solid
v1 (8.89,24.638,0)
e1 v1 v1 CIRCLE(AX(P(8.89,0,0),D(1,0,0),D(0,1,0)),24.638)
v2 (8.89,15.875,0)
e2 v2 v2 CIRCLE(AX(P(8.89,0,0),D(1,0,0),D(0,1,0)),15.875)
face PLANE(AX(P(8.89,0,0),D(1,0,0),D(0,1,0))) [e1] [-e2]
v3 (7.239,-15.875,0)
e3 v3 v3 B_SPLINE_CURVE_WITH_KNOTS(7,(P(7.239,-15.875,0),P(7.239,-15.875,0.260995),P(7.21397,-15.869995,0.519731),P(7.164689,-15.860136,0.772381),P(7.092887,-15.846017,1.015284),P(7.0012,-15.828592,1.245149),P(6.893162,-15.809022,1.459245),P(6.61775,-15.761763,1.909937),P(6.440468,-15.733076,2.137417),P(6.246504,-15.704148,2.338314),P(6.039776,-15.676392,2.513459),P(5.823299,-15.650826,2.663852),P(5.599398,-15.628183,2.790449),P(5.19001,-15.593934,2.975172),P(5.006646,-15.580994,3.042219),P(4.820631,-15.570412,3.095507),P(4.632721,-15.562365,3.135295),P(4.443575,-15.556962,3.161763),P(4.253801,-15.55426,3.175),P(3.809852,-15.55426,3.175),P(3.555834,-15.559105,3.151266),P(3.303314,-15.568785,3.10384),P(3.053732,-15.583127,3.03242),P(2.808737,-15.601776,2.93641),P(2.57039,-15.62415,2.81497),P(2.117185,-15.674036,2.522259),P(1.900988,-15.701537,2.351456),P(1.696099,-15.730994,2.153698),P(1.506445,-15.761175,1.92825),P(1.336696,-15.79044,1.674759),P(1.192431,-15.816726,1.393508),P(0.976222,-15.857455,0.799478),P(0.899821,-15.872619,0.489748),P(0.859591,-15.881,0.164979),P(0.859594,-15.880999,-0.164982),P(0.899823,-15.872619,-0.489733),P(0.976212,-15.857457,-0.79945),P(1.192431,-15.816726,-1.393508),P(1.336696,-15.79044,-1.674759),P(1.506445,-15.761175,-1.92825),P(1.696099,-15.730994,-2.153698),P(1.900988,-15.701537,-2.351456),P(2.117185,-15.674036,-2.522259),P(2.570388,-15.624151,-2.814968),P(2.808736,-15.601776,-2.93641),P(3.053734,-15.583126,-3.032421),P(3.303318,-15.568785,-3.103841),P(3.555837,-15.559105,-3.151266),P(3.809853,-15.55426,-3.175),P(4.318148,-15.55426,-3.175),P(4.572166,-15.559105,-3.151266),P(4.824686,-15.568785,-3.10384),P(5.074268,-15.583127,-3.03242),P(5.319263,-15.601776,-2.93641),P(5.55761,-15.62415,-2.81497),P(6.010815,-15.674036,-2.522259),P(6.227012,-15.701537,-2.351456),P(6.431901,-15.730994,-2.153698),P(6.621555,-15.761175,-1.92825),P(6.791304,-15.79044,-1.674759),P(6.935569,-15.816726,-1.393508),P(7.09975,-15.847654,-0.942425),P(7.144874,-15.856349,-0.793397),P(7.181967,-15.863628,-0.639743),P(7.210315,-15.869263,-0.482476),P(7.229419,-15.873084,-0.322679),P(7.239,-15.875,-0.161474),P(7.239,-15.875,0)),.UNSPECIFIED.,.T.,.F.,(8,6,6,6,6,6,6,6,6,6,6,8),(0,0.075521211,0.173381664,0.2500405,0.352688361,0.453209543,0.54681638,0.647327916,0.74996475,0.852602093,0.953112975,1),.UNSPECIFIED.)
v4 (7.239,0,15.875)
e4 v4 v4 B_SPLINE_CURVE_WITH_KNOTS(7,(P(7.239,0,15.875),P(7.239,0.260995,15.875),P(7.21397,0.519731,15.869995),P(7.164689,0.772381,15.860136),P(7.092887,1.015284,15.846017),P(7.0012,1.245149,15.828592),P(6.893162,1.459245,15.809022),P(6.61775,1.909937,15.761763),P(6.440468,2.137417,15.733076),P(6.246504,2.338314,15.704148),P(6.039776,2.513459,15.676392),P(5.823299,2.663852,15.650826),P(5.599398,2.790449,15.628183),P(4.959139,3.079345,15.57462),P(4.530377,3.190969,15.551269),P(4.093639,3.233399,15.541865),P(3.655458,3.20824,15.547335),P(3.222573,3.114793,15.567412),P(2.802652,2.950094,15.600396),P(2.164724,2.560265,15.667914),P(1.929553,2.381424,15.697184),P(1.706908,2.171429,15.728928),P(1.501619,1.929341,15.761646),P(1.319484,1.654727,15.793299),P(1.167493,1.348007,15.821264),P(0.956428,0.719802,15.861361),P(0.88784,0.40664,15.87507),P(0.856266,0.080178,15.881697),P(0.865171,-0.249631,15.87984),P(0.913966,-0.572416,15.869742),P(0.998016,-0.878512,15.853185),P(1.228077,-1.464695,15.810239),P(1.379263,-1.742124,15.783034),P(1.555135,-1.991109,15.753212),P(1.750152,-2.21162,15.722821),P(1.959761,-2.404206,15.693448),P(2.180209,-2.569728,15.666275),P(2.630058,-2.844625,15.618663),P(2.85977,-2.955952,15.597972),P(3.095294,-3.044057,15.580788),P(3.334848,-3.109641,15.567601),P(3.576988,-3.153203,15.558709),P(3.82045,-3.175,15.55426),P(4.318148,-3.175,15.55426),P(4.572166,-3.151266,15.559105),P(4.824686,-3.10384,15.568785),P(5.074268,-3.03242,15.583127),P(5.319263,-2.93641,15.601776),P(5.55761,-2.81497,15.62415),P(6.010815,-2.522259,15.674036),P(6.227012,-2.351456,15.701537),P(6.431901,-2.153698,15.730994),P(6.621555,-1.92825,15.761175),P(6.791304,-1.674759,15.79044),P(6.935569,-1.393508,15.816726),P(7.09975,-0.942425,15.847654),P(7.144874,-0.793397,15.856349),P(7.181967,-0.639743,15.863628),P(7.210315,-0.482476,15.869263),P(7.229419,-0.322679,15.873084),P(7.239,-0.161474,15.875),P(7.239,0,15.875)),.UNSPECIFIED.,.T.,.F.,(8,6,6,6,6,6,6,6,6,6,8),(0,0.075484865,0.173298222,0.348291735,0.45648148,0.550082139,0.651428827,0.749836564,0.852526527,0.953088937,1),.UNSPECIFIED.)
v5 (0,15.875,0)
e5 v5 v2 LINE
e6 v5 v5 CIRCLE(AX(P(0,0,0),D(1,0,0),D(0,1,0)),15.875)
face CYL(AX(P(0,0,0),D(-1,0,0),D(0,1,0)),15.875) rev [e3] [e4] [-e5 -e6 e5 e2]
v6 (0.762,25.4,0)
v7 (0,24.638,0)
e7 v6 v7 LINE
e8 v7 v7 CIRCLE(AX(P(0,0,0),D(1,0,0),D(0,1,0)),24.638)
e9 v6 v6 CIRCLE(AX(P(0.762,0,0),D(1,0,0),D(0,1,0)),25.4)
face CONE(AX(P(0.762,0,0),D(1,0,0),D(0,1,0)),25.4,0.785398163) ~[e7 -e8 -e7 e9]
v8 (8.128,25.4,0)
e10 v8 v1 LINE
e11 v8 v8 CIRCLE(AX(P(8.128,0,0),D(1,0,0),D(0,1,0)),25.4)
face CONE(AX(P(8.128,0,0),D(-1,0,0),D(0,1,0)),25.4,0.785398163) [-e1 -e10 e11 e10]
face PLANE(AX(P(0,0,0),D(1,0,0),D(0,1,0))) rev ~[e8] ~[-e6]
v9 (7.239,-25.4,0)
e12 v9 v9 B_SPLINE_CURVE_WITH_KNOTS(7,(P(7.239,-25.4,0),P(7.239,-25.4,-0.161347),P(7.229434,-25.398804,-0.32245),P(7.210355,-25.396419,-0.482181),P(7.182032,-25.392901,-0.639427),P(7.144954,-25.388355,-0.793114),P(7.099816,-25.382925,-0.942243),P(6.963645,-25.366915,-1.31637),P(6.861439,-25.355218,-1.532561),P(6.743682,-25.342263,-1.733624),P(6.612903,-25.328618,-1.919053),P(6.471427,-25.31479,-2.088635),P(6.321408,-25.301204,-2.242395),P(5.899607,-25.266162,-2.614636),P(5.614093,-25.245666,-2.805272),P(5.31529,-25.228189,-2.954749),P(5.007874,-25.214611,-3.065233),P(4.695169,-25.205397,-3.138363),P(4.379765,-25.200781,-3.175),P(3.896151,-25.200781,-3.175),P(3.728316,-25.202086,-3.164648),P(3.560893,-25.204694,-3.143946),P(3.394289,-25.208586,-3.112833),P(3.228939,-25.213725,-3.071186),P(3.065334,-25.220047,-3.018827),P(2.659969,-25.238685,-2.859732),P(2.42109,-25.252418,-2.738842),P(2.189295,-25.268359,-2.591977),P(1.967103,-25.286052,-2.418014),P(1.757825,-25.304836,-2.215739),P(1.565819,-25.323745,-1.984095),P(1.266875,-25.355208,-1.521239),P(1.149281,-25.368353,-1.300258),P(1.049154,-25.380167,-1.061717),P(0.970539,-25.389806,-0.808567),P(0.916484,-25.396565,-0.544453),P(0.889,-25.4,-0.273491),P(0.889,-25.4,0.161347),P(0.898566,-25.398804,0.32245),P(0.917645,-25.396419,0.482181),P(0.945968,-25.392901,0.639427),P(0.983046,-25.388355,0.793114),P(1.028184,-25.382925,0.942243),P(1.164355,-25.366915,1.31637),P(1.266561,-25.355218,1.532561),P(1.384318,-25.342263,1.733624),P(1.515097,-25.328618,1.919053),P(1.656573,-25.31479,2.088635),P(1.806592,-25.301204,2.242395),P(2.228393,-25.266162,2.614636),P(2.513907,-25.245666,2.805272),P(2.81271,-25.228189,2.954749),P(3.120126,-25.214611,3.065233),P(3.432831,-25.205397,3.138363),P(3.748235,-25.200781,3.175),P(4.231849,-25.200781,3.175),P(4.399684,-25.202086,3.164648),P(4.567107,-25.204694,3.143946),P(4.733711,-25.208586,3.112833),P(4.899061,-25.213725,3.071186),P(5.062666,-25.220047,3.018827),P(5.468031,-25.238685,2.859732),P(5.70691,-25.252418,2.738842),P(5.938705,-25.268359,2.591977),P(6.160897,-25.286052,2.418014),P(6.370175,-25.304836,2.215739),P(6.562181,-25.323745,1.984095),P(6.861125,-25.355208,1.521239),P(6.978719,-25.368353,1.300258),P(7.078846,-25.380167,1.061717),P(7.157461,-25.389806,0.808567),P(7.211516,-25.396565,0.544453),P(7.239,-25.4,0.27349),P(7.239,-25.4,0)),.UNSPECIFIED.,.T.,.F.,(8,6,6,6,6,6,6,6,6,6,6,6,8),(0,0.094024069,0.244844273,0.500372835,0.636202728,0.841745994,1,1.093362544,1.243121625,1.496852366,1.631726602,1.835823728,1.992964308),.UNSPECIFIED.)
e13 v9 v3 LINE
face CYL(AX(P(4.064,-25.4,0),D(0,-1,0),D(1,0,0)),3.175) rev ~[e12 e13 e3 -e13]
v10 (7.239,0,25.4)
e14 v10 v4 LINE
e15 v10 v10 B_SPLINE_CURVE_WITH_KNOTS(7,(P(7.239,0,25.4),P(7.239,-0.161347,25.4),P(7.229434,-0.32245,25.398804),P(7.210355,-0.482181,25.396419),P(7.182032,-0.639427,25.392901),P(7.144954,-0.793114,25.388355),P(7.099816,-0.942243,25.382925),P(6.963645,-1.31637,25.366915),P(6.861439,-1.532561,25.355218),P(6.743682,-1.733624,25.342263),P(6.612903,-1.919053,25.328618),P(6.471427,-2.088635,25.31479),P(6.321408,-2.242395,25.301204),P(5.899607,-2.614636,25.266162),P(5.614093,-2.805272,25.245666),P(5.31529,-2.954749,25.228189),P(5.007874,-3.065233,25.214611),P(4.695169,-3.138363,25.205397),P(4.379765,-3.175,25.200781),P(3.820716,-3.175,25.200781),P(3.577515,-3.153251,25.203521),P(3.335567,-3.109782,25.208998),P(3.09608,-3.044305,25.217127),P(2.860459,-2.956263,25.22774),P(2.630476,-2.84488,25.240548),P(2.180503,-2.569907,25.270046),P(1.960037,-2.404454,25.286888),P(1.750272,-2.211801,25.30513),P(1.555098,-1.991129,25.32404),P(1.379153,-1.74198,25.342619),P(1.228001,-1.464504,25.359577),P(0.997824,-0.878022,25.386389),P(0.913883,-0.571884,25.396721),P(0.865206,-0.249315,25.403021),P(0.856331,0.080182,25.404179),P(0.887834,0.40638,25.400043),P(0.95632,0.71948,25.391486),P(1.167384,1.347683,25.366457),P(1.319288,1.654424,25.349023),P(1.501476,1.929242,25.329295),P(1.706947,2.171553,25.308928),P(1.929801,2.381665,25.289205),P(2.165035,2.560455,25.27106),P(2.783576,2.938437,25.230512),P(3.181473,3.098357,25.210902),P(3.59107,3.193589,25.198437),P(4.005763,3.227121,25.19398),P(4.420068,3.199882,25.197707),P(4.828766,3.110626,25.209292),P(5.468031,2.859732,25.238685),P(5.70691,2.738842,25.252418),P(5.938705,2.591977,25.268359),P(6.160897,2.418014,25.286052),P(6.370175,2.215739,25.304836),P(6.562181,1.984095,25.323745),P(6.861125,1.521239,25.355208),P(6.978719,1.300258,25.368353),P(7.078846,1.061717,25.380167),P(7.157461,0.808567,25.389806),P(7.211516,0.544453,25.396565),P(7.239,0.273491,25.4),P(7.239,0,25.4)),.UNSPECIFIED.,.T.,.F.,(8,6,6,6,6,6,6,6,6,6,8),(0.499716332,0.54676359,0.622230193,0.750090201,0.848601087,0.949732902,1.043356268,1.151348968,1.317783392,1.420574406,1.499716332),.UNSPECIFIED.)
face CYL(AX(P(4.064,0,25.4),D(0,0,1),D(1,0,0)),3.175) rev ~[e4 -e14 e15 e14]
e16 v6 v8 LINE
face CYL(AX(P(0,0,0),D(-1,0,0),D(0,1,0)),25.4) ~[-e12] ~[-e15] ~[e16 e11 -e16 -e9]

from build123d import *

# Parameters (mm, degrees)
F0_R     = 25.4
F0_R_2   = 15.875
F1_DEPTH = 8.89
F3_R     = 3.175
F4_REACH = 59.7812561211
F6_R     = 3.175
F7_REACH = 59.7812562211
F8_SIZE  = 0.762
F9_SIZE  = 0.762


with BuildPart() as f1:
    # F0 (on Right) → F1 (new body)
    with BuildSketch(Plane.YZ):
        Circle(F0_R)
        Circle(F0_R_2, mode=Mode.SUBTRACT)
    extrude(amount=F1_DEPTH)

    f4_end = f1.faces().sort_by_distance((4.445, -15.875, 0))[0]
    # F3 (on offset) → F4 (cut, up to a face of the model that its end follows)
    with BuildSketch(Plane.XZ.offset(25.4)):
        with Locations((4.064, 0)):
            Circle(F3_R)
    f4_long = extrude(amount=-F4_REACH, mode=Mode.PRIVATE)
    add(split(f4_long, bisect_by=f4_end, keep=Keep.ALL, mode=Mode.PRIVATE).solids().sort_by_distance((4.064, -25.4, 0))[0], mode=Mode.SUBTRACT)

    f7_end = f1.faces().sort_by_distance((0.457728864, -15.875, 0))[0]
    # F6 (on offset) → F7 (cut, up to a face of the model that its end follows)
    with BuildSketch(Plane.XY.offset(25.4)):
        with Locations((4.064, 0)):
            Circle(F6_R)
    f7_long = extrude(amount=-F7_REACH, mode=Mode.PRIVATE)
    add(split(f7_long, bisect_by=f7_end, keep=Keep.ALL, mode=Mode.PRIVATE).solids().sort_by_distance((4.064, 0, 25.4))[0], mode=Mode.SUBTRACT)

    # F8
    f8_edges = [f1.edges().sort_by_distance(p)[0] for p in [
        (0, -25.4, 0),
    ]]
    chamfer(f8_edges, length=F8_SIZE)

    # F9
    f9_edges = [f1.edges().sort_by_distance(p)[0] for p in [
        (8.89, -25.4, 0),
    ]]
    chamfer(f9_edges, length=F9_SIZE)


solid = f1.part
